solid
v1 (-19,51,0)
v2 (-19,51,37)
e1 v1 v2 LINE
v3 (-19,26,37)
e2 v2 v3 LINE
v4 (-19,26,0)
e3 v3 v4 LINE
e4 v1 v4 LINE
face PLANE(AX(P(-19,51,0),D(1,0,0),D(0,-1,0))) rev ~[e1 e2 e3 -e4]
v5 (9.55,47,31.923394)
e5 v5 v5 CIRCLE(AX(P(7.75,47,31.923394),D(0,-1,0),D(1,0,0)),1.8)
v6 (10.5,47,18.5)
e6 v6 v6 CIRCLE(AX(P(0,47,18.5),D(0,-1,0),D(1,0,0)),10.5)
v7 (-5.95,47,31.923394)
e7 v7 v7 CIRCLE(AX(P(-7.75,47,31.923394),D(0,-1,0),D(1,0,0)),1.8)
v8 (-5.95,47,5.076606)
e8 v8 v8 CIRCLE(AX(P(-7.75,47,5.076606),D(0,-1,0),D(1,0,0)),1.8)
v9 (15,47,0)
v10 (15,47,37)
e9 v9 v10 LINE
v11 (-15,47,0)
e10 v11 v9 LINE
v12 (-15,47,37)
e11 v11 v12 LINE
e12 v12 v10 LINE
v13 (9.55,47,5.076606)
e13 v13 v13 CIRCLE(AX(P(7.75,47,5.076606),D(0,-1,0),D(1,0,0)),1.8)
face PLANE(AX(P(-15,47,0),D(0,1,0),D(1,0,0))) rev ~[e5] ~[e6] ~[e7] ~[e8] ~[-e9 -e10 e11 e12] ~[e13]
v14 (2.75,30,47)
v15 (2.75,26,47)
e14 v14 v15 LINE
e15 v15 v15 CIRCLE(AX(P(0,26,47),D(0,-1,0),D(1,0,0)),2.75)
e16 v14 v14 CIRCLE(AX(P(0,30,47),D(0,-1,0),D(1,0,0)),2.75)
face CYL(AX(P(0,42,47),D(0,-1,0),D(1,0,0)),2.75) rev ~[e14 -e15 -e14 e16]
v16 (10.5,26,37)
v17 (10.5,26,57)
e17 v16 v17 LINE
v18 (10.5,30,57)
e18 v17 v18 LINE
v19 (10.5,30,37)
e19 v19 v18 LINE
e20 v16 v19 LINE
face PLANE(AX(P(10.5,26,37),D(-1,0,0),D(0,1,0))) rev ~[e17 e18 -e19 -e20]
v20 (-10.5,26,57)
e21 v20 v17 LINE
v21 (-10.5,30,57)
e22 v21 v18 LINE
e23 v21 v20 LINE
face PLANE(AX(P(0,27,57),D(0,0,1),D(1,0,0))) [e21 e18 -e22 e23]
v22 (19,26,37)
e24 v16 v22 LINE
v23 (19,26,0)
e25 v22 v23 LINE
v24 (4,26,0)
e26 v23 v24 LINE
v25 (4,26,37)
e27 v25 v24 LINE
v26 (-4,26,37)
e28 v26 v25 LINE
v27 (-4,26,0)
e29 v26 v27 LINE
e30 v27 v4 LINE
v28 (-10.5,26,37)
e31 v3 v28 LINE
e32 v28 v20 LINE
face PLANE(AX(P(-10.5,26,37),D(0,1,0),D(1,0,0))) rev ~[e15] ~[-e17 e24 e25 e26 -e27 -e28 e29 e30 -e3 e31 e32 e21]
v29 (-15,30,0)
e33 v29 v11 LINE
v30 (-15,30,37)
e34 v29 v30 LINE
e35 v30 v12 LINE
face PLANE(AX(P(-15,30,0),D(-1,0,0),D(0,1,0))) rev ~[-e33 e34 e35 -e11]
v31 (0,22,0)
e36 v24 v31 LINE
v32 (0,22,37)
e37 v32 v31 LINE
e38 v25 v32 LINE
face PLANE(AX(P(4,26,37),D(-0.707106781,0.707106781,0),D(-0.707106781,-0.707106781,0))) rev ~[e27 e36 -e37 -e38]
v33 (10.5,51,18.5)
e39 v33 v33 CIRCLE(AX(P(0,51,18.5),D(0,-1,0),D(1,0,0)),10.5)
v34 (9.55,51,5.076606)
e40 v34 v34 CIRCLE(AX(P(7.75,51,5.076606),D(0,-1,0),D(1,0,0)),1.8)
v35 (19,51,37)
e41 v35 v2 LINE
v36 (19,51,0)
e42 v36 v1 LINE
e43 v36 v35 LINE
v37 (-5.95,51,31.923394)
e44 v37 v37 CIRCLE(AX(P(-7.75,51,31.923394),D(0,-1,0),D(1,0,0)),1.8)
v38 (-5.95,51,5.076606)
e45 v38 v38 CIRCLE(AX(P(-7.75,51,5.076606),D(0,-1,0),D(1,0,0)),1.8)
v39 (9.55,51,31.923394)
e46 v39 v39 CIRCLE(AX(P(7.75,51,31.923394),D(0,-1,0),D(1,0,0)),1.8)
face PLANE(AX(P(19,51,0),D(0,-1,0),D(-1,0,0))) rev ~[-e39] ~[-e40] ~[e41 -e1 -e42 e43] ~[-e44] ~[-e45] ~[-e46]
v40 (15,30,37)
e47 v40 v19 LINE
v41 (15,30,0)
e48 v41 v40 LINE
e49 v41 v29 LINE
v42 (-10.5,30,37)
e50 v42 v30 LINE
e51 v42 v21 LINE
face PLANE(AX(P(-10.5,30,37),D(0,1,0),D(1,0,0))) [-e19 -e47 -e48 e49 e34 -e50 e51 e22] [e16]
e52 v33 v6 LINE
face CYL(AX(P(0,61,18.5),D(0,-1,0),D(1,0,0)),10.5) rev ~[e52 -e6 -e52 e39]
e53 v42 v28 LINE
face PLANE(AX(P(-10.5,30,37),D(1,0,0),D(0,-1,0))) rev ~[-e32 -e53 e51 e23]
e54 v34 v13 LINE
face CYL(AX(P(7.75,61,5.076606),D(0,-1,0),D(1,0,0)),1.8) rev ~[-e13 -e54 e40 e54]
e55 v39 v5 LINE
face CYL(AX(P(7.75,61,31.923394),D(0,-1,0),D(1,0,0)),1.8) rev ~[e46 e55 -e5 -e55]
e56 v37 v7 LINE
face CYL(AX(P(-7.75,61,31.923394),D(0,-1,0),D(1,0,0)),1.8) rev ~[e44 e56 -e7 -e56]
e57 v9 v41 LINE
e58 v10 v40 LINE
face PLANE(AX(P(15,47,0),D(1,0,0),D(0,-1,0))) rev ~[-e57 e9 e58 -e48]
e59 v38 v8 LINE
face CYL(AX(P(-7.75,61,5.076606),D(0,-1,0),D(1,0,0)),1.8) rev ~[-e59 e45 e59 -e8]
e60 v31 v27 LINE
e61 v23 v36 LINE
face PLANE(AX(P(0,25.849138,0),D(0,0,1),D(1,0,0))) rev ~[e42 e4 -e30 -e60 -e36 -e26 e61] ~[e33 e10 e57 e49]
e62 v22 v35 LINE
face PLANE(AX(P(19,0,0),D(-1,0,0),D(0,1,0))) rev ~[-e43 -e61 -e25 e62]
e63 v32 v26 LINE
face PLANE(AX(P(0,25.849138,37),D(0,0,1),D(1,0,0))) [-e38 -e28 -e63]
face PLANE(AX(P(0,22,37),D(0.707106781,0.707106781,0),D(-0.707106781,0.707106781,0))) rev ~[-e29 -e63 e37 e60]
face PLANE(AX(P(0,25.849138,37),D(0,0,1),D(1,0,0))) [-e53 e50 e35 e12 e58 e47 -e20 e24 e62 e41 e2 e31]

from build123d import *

# Parameters (mm, degrees)
F1_DEPTH  = 37
F3_DEPTH  = 37.001
F5_DEPTH  = 37
F7_D      = 3.6
F7_DEPTH  = 10
F7_TIP    = 1.0815491142
F8_D      = 21
F8_DEPTH  = 10
F8_TIP    = 6.3090364998
F9_W      = 11
F9_H      = 5
F10_DEPTH = 37.001
F11_W     = 21
F11_H     = 2
F12_DEPTH = 20
F14_D     = 5.5
F14_DEPTH = 12
F14_TIP   = 1.6523667023


# Not quite as in the source:
# - a feature names something its author has since deleted; it is built from what else it names


with BuildPart() as f1:
    # F0 (on Top) → F1 (new body)
    with BuildSketch(Plane.XY):
        Polygon((-13.5, 27), (-13.5, 0), (-5, 0), (5, 0), (13.5, 0), (13.5, 27), align=None)
    extrude(amount=F1_DEPTH)

    # F2 (on face) → F3 (cut, through all)
    with BuildSketch(Plane.XY.offset(37)):
        Polygon((0, 15.5), (0, 22), (-4, 26), (-10.5, 26), (-10.5, 19.5), (-6.5, 15.5), align=None)
        Polygon((4, 26), (0, 22), (0, 15.5), (6.5, 15.5), (10.5, 19.5), (10.5, 26), align=None)
        Polygon((6.5, 15.5), (0, 15.5), (0, 9), (4, 5), (10.5, 5), (10.5, 11.5), align=None)
        Polygon((0, 9), (0, 15.5), (-6.5, 15.5), (-10.5, 11.5), (-10.5, 5), (-4, 5), align=None)
        Polygon((0, 5), (0, 9), (-4, 5), align=None)
        Polygon((4, 5), (0, 9), (0, 5), align=None)
    extrude(amount=-F3_DEPTH, mode=Mode.SUBTRACT)

    # F4 (on Top) → F5 (join, through all)
    with BuildSketch(Plane.XY):
        Polygon((-13.5, 27), (0, 27), (13.5, 27), (13.5, 0), (19, 0), (19, 51), (-19, 51), (-19, 0), (-13.5, 0), align=None)
        Polygon((15, 30), (0, 30), (-15, 30), (-15, 47), (15, 47), align=None, mode=Mode.SUBTRACT)
    extrude(amount=F5_DEPTH)

    # F7
    with Locations(Plane(origin=(0, 51, 0), x_dir=(-1, 0, 0), z_dir=(0, 1, 0))):
        with Locations((-7.75, 5.0766062413), (7.75, 5.0766062413), (7.75, 31.9233937587), (-7.75, 31.9233937587)):
            Hole(F7_D / 2, depth=F7_DEPTH)
            with Locations((0, 0, -(F7_DEPTH + F7_TIP / 2))):  # 118° drill point
                Cone(0, F7_D / 2, F7_TIP, mode=Mode.SUBTRACT)

    # F8
    with Locations(Plane(origin=(0, 51, 0), x_dir=(-1, 0, 0), z_dir=(0, 1, 0))):
        with Locations((0, 18.5)):
            Hole(F8_D / 2, depth=F8_DEPTH)
            with Locations((0, 0, -(F8_DEPTH + F8_TIP / 2))):  # 118° drill point
                Cone(0, F8_D / 2, F8_TIP, mode=Mode.SUBTRACT)

    # F9 (on face) → F10 (cut, through all)
    with BuildSketch(Plane.XY.offset(37)):
        Polygon((-19, 26), (-19, 0), (-5.5, 0), (-5.5, 5), (-10.5, 5), (-10.5, 11.5), (-6.5, 15.5), (-10.5, 19.5), (-10.5, 26), align=None)
        Polygon((5.5, 5), (5.5, 0), (19, 0), (19, 26), (10.5, 26), (10.5, 19.5), (6.5, 15.5), (10.5, 11.5), (10.5, 5), align=None)
        with Locations((0, 2.5)):
            Rectangle(F9_W, F9_H)
    extrude(amount=-F10_DEPTH, mode=Mode.SUBTRACT)

    # F11 (on face) → F12 (join)
    with BuildSketch(Plane.XY.offset(37)):
        with Locations((0, 27)):
            Rectangle(F11_W, F11_H)
        with Locations((0, 29)):
            Rectangle(F11_W, F11_H)
        Polygon((4, 26), (10.5, 26), (10.5, 28), (-10.5, 28), (-10.5, 26), (-4, 26), align=None)
    extrude(amount=F12_DEPTH)

    # F14
    with Locations(Plane(origin=(0, 30, 0), x_dir=(-1, 0, 0), z_dir=(0, 1, 0))):
        with Locations((0, 47)):
            Hole(F14_D / 2, depth=F14_DEPTH)
            with Locations((0, 0, -(F14_DEPTH + F14_TIP / 2))):  # 118° drill point
                Cone(0, F14_D / 2, F14_TIP, mode=Mode.SUBTRACT)


solid = f1.part
